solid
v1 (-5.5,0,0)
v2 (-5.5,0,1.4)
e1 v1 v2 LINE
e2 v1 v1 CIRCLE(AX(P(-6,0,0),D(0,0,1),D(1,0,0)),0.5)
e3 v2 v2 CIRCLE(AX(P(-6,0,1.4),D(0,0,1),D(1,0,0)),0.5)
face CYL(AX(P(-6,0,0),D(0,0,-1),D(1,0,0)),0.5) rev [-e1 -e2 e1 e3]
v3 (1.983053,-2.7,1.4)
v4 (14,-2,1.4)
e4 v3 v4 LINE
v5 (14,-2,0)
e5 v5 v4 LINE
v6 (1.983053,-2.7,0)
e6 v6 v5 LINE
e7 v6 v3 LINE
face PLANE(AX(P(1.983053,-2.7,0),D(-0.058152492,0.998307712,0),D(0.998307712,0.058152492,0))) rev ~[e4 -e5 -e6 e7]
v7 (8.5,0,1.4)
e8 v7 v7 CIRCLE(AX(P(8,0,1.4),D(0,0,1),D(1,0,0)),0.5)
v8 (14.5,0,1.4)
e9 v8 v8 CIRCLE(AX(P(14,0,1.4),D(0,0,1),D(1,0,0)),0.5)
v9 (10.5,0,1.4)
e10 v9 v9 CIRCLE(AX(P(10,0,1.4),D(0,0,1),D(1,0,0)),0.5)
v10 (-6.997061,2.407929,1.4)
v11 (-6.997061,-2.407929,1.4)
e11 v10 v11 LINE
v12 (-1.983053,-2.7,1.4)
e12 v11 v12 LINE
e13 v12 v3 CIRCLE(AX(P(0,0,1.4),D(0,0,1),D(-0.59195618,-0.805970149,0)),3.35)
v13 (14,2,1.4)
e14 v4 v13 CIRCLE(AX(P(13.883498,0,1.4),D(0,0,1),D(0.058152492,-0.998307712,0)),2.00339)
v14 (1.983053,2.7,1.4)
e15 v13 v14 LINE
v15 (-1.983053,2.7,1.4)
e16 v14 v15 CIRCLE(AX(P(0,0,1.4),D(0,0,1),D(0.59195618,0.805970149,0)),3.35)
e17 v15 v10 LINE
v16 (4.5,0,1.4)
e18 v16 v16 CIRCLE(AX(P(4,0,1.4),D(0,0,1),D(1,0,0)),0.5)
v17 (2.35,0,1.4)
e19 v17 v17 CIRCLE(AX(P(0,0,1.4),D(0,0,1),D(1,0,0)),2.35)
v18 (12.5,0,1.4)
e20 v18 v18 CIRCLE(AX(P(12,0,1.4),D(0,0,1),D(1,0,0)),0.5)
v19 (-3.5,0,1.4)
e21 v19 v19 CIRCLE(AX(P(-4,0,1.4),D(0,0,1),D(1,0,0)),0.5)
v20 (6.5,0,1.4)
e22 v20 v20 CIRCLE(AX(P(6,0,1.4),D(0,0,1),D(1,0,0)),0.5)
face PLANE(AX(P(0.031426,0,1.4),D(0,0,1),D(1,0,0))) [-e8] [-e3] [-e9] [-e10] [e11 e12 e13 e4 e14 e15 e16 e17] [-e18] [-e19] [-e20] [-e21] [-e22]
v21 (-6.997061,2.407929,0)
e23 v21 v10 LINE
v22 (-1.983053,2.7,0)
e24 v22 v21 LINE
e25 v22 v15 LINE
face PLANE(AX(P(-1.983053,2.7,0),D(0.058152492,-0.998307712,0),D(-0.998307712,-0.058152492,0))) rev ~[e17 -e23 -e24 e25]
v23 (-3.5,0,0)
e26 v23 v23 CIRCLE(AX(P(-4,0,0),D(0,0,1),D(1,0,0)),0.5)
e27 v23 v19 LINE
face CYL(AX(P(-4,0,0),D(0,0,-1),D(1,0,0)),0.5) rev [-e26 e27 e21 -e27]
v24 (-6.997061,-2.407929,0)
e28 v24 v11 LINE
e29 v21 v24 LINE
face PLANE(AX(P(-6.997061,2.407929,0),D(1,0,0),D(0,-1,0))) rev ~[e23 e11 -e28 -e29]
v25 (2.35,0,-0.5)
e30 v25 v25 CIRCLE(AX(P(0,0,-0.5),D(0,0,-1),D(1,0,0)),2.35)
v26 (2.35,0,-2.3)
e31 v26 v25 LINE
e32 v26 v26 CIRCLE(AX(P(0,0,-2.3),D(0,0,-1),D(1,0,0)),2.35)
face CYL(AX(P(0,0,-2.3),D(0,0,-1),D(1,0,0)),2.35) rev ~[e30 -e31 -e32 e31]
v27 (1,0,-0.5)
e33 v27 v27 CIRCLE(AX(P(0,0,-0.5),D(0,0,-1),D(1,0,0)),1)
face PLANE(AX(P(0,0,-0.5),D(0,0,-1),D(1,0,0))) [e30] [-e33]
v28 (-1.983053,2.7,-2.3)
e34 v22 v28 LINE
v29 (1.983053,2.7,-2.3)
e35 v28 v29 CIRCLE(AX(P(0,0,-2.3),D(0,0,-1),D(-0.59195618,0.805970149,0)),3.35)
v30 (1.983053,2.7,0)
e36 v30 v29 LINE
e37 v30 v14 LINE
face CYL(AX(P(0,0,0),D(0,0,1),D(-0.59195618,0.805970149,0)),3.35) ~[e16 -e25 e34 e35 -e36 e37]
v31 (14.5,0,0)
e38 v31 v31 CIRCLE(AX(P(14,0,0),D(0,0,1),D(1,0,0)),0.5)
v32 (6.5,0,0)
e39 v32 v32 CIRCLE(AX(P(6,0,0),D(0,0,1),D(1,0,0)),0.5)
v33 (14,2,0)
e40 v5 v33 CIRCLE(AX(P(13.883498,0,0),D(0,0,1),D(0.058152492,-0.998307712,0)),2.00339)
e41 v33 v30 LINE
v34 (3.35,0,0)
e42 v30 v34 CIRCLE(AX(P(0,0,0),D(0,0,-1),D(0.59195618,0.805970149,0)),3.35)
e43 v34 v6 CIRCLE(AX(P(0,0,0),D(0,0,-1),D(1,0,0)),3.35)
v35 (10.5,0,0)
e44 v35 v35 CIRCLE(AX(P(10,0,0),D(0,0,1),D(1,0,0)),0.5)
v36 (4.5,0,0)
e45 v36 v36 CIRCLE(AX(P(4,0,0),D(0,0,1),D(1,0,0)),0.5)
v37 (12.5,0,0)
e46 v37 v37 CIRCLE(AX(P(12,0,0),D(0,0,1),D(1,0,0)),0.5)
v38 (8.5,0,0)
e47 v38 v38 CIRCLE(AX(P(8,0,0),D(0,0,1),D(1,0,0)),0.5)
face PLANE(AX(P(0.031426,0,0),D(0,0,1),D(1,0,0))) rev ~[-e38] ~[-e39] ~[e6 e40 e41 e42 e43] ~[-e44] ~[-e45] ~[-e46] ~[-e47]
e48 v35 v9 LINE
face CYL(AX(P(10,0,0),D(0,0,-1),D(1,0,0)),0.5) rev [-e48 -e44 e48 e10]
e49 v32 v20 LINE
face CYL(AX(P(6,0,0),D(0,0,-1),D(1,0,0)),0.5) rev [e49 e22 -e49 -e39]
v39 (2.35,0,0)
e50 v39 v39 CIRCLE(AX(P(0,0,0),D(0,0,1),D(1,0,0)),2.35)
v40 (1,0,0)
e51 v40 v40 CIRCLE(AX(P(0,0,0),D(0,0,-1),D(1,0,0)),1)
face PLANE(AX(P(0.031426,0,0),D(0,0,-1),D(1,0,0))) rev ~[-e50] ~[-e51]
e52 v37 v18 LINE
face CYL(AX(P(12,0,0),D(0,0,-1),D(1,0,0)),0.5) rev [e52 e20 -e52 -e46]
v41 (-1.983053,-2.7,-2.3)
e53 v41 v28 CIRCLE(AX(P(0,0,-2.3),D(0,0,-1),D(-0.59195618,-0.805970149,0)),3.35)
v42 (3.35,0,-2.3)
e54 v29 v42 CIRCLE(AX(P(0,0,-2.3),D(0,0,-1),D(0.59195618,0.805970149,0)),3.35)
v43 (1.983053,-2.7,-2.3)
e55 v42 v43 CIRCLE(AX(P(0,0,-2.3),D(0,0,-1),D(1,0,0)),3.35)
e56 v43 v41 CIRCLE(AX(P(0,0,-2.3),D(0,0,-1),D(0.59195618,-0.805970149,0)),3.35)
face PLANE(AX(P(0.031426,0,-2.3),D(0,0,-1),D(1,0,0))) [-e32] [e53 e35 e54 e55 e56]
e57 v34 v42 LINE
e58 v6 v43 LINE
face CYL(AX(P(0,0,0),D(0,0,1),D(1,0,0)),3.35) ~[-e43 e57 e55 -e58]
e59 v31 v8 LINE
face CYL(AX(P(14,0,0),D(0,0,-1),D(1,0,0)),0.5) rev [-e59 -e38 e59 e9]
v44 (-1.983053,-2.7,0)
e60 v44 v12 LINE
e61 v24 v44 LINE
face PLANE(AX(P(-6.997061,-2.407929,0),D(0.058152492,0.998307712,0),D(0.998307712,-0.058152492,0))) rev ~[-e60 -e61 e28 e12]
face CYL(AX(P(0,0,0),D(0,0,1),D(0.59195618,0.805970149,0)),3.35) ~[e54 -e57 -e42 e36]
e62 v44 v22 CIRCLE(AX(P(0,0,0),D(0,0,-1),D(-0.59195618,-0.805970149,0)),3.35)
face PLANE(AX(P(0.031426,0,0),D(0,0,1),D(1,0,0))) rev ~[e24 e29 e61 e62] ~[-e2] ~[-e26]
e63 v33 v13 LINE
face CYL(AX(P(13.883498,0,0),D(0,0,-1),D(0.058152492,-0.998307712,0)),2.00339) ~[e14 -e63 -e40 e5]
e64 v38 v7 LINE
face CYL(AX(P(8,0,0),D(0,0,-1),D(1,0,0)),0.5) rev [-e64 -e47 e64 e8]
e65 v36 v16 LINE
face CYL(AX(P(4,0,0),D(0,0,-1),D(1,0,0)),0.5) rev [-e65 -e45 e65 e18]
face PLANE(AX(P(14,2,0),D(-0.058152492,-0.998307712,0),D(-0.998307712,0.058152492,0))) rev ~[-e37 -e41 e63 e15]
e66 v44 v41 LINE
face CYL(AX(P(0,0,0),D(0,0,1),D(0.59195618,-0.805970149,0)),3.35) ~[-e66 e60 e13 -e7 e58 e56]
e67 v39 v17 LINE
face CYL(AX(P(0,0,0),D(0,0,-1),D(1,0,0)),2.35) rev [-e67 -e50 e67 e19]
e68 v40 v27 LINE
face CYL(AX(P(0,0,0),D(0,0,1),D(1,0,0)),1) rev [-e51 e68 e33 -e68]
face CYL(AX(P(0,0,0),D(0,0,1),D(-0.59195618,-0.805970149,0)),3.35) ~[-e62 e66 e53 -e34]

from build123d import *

# Parameters (mm, degrees)
F0_R     = 2.35
F0_R_2   = 0.5
F1_DEPTH = 1.4
F2_R     = 2.35
F2_R_2   = 1
F3_DEPTH = 2.3
F4_R     = 2.35
F4_R_2   = 1
F5_DEPTH = 1.8


with BuildPart() as f1:
    # F0 (on Top) → F1 (new body)
    with BuildSketch(Plane.XY):
        with BuildLine():
            ThreePointArc((1.9830532015, -2.7), (2.9887897404, -1.5131542841), (3.35, 0))
            ThreePointArc((3.35, 0), (2.9887897404, 1.5131542841), (1.9830532015, 2.7))
            ThreePointArc((1.9830532015, 2.7), (0, 3.35), (-1.9830532015, 2.7))
            ThreePointArc((-1.9830532015, 2.7), (-3.35, 0), (-1.9830532015, -2.7))
            ThreePointArc((-1.9830532015, -2.7), (0, -3.35), (1.9830532015, -2.7))
        make_face()
        Circle(F0_R, mode=Mode.SUBTRACT)
        with BuildLine():
            ThreePointArc((1.9830532015, 2.7), (2.9887897404, 1.5131542841), (3.35, 0))
            ThreePointArc((3.35, 0), (2.9887897404, -1.5131542841), (1.9830532015, -2.7))
            Line((1.9830532015, -2.7), (14, -2))
            ThreePointArc((14, -2), (15.886888175, 0), (14, 2))
            Line((14, 2), (1.9830532015, 2.7))
        make_face()
        with Locations((4, 0)):
            Circle(F0_R_2, mode=Mode.SUBTRACT)
        with Locations((6, 0)):
            Circle(F0_R_2, mode=Mode.SUBTRACT)
        with Locations((8, 0)):
            Circle(F0_R_2, mode=Mode.SUBTRACT)
        with Locations((10, 0)):
            Circle(F0_R_2, mode=Mode.SUBTRACT)
        with Locations((12, 0)):
            Circle(F0_R_2, mode=Mode.SUBTRACT)
        with Locations((14, 0)):
            Circle(F0_R_2, mode=Mode.SUBTRACT)
        with BuildLine():
            ThreePointArc((-1.9830532015, -2.7), (-3.35, 0), (-1.9830532015, 2.7))
            Line((-1.9830532015, 2.7), (-6.9970610693, 2.4079286805))
            Line((-6.9970610693, 2.4079286805), (-6.9970610693, -2.4079286805))
            Line((-6.9970610693, -2.4079286805), (-1.9830532015, -2.7))
        make_face()
        with Locations((-6, 0)):
            Circle(F0_R_2, mode=Mode.SUBTRACT)
        with Locations((-4, 0)):
            Circle(F0_R_2, mode=Mode.SUBTRACT)
    extrude(amount=F1_DEPTH)

    # F2 (on face) → F3 (join)
    with BuildSketch(Plane(origin=(0, 0, 0), x_dir=(1, 0, 0), z_dir=(0, 0, -1))):
        with BuildLine():
            ThreePointArc((1.9830532015, -2.7), (2.9887897404, -1.5131542841), (3.35, 0))
            ThreePointArc((3.35, 0), (2.9887897404, 1.5131542841), (1.9830532015, 2.7))
            ThreePointArc((1.9830532015, 2.7), (0, 3.35), (-1.9830532015, 2.7))
            ThreePointArc((-1.9830532015, 2.7), (-3.35, 0), (-1.9830532015, -2.7))
            ThreePointArc((-1.9830532015, -2.7), (0, -3.35), (1.9830532015, -2.7))
        make_face()
        Circle(F2_R, mode=Mode.SUBTRACT)
        Circle(F2_R)
        Circle(F2_R_2, mode=Mode.SUBTRACT)
    extrude(amount=F3_DEPTH)

    # F4 (on face) → F5 (cut)
    with BuildSketch(Plane(origin=(0, 0, -2.3), x_dir=(1, 0, 0), z_dir=(0, 0, -1))):
        Circle(F4_R)
        Circle(F4_R_2, mode=Mode.SUBTRACT)
    extrude(amount=-F5_DEPTH, mode=Mode.SUBTRACT)


solid = f1.part
